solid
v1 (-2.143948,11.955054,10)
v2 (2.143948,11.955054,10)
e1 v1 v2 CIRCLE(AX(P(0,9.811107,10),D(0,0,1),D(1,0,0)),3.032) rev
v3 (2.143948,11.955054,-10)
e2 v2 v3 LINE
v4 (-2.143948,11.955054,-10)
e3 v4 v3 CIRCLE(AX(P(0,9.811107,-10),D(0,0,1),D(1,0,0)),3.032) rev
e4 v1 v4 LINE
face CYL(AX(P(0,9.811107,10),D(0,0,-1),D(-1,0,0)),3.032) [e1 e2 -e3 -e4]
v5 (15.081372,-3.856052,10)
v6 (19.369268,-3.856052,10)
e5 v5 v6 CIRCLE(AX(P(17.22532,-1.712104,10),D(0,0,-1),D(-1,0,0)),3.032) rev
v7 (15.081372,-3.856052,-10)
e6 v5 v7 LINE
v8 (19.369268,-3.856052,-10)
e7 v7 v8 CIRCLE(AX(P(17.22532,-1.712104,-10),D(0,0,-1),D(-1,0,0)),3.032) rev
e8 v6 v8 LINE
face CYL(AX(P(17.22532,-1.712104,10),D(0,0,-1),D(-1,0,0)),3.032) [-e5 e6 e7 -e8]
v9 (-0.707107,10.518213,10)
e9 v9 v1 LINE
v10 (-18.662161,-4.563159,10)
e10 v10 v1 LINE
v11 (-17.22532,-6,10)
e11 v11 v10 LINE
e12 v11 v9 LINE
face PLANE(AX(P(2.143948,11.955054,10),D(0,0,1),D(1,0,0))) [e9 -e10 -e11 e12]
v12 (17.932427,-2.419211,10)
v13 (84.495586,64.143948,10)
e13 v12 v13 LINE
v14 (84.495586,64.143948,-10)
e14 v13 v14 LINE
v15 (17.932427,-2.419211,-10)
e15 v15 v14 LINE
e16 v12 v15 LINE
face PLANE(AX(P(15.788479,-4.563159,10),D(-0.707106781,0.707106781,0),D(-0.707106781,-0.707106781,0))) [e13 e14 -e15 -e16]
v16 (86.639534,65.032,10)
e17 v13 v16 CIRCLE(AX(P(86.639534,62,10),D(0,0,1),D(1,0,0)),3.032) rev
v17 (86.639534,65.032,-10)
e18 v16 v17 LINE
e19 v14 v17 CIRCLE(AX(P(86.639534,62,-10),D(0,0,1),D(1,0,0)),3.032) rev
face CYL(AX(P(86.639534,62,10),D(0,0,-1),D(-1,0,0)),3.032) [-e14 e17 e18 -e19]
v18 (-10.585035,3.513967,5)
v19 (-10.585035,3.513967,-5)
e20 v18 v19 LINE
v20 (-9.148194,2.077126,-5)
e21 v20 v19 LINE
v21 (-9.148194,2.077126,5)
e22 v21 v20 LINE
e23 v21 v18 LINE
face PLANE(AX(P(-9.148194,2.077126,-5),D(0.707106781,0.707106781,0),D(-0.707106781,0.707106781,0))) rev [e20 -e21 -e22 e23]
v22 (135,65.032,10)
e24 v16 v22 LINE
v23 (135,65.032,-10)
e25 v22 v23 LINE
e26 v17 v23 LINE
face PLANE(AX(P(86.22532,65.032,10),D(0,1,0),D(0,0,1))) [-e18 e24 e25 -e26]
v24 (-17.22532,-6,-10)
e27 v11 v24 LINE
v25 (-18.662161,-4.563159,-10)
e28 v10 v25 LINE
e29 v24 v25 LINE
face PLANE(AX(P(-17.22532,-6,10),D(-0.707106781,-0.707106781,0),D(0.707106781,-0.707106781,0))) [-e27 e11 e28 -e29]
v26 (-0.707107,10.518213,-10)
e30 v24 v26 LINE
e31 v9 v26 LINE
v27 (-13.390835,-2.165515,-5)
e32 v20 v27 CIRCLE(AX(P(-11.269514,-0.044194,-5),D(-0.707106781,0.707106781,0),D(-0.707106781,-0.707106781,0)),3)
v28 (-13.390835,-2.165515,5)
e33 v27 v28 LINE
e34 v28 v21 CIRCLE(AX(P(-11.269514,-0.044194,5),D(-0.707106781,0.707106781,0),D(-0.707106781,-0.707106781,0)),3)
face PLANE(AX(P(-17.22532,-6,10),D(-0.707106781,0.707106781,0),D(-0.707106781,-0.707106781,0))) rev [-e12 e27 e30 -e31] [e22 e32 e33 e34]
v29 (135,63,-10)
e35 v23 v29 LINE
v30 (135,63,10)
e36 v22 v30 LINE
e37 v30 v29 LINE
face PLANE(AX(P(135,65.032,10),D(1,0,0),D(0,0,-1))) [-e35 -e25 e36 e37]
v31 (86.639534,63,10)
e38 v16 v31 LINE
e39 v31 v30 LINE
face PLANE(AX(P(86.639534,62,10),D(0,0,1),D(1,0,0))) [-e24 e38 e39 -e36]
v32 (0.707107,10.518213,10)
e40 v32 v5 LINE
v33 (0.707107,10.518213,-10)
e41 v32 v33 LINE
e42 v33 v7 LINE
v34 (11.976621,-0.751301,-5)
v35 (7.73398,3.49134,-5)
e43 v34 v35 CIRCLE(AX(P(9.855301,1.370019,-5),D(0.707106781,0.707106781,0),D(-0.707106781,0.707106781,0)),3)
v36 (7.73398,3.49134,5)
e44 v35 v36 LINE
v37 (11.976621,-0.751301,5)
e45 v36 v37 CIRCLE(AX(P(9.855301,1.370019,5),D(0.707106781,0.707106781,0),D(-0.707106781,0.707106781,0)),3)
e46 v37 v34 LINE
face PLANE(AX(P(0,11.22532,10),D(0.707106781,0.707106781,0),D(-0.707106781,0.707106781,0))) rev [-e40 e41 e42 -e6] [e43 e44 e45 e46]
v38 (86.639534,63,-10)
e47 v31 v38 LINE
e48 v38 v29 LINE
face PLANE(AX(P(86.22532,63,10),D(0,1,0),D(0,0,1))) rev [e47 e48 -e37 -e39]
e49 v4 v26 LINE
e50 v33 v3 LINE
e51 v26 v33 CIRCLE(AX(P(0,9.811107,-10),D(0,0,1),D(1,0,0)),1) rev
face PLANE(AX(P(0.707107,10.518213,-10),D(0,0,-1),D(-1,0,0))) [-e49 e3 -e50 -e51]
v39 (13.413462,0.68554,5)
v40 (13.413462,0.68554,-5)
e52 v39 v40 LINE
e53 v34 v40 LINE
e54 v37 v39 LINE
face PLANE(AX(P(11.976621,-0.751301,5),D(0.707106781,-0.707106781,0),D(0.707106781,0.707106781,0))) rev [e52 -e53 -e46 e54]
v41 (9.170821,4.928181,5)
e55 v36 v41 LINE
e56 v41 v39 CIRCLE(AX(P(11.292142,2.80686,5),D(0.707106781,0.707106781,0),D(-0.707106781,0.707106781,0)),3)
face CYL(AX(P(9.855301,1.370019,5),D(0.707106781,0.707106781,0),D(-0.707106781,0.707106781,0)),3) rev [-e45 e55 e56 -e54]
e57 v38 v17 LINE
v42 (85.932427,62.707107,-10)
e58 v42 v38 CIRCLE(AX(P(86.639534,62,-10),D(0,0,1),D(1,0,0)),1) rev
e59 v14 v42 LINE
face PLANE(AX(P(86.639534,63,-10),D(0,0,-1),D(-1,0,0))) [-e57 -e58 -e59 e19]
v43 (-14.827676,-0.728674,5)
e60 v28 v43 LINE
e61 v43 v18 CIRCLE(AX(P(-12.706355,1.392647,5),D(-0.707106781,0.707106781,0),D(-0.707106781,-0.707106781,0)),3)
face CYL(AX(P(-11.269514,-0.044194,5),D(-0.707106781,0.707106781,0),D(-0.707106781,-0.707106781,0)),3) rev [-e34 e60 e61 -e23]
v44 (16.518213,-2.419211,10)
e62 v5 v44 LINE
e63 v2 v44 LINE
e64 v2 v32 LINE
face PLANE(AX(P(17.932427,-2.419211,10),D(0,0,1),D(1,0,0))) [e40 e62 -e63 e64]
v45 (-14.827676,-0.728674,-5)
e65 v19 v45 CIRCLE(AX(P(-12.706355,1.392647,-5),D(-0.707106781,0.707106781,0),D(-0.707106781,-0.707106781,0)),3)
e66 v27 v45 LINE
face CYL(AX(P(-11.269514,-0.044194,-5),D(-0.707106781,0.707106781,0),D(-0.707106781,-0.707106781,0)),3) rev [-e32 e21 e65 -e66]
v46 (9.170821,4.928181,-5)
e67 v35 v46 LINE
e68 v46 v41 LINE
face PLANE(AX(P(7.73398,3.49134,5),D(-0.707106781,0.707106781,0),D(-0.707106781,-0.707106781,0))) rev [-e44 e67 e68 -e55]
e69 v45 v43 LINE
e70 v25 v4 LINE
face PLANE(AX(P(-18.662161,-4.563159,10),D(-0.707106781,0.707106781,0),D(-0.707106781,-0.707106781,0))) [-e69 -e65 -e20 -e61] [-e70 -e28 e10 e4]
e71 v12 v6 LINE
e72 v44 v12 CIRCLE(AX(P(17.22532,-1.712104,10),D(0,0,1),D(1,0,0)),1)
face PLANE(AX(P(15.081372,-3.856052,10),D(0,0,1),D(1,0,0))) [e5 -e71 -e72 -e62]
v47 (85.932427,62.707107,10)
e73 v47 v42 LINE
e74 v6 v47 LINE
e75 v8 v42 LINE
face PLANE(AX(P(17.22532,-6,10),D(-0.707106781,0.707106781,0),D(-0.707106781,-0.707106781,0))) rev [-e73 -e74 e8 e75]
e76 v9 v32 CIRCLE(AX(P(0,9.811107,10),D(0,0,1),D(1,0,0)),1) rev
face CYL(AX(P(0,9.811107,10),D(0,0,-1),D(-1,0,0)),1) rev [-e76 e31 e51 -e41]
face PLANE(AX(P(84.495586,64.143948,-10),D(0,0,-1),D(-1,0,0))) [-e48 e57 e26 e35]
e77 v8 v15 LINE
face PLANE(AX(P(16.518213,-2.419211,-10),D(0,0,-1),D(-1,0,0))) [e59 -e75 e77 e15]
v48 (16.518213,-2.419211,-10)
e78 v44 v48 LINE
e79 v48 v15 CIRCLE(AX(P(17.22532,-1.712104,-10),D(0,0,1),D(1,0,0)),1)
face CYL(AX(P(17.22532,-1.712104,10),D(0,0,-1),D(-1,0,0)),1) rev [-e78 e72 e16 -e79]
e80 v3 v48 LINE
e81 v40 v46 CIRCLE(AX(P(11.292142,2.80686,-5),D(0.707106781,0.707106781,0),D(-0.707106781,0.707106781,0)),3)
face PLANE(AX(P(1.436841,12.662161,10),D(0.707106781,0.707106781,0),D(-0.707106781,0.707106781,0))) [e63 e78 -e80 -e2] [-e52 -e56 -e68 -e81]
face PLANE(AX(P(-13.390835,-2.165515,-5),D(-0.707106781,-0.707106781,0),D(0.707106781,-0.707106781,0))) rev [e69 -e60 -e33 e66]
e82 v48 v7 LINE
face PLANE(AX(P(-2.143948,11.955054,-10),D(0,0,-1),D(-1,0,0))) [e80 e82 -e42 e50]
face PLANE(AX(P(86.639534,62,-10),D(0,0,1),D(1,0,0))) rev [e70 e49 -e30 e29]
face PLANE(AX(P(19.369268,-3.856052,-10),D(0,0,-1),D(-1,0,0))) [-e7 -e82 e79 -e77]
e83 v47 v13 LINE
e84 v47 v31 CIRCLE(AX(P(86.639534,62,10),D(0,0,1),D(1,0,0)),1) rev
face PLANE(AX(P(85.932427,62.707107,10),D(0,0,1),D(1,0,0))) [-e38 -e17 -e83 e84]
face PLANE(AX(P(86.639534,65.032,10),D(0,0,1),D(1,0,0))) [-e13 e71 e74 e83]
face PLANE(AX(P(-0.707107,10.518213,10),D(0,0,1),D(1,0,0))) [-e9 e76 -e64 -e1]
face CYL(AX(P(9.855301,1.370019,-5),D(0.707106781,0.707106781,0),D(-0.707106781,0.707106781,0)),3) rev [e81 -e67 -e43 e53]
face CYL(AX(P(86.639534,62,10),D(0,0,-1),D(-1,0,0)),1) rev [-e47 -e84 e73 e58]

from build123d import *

# Parameters (mm, degrees)
BASE_FLANGE1_DEPTH = 10
CUT_EXTRUDE1_DEPTH = 2.032
CUT_EXTRUDE2_DEPTH = 2.032


# Sheet-metal steps are written as plain solids
with BuildPart() as part:
    # Sketch1 → Base-Flange1 (new, symmetric)
    with BuildSketch(Plane.XY):
        with BuildLine():
            Line((-17.225320151, -6), (-0.707106781, 10.51821337))
            ThreePointArc((-0.707106781, 10.51821337), (0, 10.811106589), (0.707106781, 10.51821337))
            Line((0.707106781, 10.51821337), (15.081372391, -3.856052239))
            ThreePointArc((15.081372391, -3.856052239), (17.225320151, -4.744104479), (19.369267912, -3.856052239))
            Line((19.369267912, -3.856052239), (85.932426933, 62.707106781))
            ThreePointArc((85.932426933, 62.707106781), (86.256850281, 62.923879533), (86.639533714, 63))
            Line((86.639533714, 63), (135, 63))
            Line((135, 63), (135, 65.032))
            Line((135, 65.032), (86.639533714, 65.032))
            ThreePointArc((86.639533714, 65.032), (85.479237547, 64.801202743), (84.495585953, 64.143947761))
            Line((84.495585953, 64.143947761), (17.932426933, -2.41921126))
            ThreePointArc((17.932426933, -2.41921126), (17.225320151, -2.712104479), (16.51821337, -2.41921126))
            Line((16.51821337, -2.41921126), (2.143947761, 11.95505435))
            ThreePointArc((2.143947761, 11.95505435), (0, 12.843106589), (-2.143947761, 11.95505435))
            Line((-2.143947761, 11.95505435), (-18.662161131, -4.563159021))
            Line((-18.662161131, -4.563159021), (-17.225320151, -6))
        make_face()
    extrude(amount=BASE_FLANGE1_DEPTH, both=True)

    # Sketch6 → Cut-Extrude1 (cut)
    with BuildSketch(Plane(origin=(-7.049501055, 7.049501055, 0), x_dir=(0, 0, 1), z_dir=(-0.7071067811865488, 0.7071067811865464, 0))):
        with BuildLine():
            Line((-5, -5), (5, -5))
            ThreePointArc((5, -5), (8, -8), (5, -11))
            Line((5, -11), (-5, -11))
            ThreePointArc((-5, -11), (-8, -8), (-5, -5))
        make_face()
    extrude(amount=-CUT_EXTRUDE1_DEPTH, mode=Mode.SUBTRACT)

    # Sketch9 → Cut-Extrude2 (cut)
    with BuildSketch(Plane(origin=(7.049501055, 7.049501055, 0), x_dir=(0, 0, -1), z_dir=(0.7071067811865488, 0.7071067811865464, 0))):
        with BuildLine():
            Line((-5, -3), (5, -3))
            ThreePointArc((5, -3), (8, -6), (5, -9))
            Line((5, -9), (-5, -9))
            ThreePointArc((-5, -9), (-8, -6), (-5, -3))
        make_face()
    extrude(amount=-CUT_EXTRUDE2_DEPTH, mode=Mode.SUBTRACT)


solid = part.part
